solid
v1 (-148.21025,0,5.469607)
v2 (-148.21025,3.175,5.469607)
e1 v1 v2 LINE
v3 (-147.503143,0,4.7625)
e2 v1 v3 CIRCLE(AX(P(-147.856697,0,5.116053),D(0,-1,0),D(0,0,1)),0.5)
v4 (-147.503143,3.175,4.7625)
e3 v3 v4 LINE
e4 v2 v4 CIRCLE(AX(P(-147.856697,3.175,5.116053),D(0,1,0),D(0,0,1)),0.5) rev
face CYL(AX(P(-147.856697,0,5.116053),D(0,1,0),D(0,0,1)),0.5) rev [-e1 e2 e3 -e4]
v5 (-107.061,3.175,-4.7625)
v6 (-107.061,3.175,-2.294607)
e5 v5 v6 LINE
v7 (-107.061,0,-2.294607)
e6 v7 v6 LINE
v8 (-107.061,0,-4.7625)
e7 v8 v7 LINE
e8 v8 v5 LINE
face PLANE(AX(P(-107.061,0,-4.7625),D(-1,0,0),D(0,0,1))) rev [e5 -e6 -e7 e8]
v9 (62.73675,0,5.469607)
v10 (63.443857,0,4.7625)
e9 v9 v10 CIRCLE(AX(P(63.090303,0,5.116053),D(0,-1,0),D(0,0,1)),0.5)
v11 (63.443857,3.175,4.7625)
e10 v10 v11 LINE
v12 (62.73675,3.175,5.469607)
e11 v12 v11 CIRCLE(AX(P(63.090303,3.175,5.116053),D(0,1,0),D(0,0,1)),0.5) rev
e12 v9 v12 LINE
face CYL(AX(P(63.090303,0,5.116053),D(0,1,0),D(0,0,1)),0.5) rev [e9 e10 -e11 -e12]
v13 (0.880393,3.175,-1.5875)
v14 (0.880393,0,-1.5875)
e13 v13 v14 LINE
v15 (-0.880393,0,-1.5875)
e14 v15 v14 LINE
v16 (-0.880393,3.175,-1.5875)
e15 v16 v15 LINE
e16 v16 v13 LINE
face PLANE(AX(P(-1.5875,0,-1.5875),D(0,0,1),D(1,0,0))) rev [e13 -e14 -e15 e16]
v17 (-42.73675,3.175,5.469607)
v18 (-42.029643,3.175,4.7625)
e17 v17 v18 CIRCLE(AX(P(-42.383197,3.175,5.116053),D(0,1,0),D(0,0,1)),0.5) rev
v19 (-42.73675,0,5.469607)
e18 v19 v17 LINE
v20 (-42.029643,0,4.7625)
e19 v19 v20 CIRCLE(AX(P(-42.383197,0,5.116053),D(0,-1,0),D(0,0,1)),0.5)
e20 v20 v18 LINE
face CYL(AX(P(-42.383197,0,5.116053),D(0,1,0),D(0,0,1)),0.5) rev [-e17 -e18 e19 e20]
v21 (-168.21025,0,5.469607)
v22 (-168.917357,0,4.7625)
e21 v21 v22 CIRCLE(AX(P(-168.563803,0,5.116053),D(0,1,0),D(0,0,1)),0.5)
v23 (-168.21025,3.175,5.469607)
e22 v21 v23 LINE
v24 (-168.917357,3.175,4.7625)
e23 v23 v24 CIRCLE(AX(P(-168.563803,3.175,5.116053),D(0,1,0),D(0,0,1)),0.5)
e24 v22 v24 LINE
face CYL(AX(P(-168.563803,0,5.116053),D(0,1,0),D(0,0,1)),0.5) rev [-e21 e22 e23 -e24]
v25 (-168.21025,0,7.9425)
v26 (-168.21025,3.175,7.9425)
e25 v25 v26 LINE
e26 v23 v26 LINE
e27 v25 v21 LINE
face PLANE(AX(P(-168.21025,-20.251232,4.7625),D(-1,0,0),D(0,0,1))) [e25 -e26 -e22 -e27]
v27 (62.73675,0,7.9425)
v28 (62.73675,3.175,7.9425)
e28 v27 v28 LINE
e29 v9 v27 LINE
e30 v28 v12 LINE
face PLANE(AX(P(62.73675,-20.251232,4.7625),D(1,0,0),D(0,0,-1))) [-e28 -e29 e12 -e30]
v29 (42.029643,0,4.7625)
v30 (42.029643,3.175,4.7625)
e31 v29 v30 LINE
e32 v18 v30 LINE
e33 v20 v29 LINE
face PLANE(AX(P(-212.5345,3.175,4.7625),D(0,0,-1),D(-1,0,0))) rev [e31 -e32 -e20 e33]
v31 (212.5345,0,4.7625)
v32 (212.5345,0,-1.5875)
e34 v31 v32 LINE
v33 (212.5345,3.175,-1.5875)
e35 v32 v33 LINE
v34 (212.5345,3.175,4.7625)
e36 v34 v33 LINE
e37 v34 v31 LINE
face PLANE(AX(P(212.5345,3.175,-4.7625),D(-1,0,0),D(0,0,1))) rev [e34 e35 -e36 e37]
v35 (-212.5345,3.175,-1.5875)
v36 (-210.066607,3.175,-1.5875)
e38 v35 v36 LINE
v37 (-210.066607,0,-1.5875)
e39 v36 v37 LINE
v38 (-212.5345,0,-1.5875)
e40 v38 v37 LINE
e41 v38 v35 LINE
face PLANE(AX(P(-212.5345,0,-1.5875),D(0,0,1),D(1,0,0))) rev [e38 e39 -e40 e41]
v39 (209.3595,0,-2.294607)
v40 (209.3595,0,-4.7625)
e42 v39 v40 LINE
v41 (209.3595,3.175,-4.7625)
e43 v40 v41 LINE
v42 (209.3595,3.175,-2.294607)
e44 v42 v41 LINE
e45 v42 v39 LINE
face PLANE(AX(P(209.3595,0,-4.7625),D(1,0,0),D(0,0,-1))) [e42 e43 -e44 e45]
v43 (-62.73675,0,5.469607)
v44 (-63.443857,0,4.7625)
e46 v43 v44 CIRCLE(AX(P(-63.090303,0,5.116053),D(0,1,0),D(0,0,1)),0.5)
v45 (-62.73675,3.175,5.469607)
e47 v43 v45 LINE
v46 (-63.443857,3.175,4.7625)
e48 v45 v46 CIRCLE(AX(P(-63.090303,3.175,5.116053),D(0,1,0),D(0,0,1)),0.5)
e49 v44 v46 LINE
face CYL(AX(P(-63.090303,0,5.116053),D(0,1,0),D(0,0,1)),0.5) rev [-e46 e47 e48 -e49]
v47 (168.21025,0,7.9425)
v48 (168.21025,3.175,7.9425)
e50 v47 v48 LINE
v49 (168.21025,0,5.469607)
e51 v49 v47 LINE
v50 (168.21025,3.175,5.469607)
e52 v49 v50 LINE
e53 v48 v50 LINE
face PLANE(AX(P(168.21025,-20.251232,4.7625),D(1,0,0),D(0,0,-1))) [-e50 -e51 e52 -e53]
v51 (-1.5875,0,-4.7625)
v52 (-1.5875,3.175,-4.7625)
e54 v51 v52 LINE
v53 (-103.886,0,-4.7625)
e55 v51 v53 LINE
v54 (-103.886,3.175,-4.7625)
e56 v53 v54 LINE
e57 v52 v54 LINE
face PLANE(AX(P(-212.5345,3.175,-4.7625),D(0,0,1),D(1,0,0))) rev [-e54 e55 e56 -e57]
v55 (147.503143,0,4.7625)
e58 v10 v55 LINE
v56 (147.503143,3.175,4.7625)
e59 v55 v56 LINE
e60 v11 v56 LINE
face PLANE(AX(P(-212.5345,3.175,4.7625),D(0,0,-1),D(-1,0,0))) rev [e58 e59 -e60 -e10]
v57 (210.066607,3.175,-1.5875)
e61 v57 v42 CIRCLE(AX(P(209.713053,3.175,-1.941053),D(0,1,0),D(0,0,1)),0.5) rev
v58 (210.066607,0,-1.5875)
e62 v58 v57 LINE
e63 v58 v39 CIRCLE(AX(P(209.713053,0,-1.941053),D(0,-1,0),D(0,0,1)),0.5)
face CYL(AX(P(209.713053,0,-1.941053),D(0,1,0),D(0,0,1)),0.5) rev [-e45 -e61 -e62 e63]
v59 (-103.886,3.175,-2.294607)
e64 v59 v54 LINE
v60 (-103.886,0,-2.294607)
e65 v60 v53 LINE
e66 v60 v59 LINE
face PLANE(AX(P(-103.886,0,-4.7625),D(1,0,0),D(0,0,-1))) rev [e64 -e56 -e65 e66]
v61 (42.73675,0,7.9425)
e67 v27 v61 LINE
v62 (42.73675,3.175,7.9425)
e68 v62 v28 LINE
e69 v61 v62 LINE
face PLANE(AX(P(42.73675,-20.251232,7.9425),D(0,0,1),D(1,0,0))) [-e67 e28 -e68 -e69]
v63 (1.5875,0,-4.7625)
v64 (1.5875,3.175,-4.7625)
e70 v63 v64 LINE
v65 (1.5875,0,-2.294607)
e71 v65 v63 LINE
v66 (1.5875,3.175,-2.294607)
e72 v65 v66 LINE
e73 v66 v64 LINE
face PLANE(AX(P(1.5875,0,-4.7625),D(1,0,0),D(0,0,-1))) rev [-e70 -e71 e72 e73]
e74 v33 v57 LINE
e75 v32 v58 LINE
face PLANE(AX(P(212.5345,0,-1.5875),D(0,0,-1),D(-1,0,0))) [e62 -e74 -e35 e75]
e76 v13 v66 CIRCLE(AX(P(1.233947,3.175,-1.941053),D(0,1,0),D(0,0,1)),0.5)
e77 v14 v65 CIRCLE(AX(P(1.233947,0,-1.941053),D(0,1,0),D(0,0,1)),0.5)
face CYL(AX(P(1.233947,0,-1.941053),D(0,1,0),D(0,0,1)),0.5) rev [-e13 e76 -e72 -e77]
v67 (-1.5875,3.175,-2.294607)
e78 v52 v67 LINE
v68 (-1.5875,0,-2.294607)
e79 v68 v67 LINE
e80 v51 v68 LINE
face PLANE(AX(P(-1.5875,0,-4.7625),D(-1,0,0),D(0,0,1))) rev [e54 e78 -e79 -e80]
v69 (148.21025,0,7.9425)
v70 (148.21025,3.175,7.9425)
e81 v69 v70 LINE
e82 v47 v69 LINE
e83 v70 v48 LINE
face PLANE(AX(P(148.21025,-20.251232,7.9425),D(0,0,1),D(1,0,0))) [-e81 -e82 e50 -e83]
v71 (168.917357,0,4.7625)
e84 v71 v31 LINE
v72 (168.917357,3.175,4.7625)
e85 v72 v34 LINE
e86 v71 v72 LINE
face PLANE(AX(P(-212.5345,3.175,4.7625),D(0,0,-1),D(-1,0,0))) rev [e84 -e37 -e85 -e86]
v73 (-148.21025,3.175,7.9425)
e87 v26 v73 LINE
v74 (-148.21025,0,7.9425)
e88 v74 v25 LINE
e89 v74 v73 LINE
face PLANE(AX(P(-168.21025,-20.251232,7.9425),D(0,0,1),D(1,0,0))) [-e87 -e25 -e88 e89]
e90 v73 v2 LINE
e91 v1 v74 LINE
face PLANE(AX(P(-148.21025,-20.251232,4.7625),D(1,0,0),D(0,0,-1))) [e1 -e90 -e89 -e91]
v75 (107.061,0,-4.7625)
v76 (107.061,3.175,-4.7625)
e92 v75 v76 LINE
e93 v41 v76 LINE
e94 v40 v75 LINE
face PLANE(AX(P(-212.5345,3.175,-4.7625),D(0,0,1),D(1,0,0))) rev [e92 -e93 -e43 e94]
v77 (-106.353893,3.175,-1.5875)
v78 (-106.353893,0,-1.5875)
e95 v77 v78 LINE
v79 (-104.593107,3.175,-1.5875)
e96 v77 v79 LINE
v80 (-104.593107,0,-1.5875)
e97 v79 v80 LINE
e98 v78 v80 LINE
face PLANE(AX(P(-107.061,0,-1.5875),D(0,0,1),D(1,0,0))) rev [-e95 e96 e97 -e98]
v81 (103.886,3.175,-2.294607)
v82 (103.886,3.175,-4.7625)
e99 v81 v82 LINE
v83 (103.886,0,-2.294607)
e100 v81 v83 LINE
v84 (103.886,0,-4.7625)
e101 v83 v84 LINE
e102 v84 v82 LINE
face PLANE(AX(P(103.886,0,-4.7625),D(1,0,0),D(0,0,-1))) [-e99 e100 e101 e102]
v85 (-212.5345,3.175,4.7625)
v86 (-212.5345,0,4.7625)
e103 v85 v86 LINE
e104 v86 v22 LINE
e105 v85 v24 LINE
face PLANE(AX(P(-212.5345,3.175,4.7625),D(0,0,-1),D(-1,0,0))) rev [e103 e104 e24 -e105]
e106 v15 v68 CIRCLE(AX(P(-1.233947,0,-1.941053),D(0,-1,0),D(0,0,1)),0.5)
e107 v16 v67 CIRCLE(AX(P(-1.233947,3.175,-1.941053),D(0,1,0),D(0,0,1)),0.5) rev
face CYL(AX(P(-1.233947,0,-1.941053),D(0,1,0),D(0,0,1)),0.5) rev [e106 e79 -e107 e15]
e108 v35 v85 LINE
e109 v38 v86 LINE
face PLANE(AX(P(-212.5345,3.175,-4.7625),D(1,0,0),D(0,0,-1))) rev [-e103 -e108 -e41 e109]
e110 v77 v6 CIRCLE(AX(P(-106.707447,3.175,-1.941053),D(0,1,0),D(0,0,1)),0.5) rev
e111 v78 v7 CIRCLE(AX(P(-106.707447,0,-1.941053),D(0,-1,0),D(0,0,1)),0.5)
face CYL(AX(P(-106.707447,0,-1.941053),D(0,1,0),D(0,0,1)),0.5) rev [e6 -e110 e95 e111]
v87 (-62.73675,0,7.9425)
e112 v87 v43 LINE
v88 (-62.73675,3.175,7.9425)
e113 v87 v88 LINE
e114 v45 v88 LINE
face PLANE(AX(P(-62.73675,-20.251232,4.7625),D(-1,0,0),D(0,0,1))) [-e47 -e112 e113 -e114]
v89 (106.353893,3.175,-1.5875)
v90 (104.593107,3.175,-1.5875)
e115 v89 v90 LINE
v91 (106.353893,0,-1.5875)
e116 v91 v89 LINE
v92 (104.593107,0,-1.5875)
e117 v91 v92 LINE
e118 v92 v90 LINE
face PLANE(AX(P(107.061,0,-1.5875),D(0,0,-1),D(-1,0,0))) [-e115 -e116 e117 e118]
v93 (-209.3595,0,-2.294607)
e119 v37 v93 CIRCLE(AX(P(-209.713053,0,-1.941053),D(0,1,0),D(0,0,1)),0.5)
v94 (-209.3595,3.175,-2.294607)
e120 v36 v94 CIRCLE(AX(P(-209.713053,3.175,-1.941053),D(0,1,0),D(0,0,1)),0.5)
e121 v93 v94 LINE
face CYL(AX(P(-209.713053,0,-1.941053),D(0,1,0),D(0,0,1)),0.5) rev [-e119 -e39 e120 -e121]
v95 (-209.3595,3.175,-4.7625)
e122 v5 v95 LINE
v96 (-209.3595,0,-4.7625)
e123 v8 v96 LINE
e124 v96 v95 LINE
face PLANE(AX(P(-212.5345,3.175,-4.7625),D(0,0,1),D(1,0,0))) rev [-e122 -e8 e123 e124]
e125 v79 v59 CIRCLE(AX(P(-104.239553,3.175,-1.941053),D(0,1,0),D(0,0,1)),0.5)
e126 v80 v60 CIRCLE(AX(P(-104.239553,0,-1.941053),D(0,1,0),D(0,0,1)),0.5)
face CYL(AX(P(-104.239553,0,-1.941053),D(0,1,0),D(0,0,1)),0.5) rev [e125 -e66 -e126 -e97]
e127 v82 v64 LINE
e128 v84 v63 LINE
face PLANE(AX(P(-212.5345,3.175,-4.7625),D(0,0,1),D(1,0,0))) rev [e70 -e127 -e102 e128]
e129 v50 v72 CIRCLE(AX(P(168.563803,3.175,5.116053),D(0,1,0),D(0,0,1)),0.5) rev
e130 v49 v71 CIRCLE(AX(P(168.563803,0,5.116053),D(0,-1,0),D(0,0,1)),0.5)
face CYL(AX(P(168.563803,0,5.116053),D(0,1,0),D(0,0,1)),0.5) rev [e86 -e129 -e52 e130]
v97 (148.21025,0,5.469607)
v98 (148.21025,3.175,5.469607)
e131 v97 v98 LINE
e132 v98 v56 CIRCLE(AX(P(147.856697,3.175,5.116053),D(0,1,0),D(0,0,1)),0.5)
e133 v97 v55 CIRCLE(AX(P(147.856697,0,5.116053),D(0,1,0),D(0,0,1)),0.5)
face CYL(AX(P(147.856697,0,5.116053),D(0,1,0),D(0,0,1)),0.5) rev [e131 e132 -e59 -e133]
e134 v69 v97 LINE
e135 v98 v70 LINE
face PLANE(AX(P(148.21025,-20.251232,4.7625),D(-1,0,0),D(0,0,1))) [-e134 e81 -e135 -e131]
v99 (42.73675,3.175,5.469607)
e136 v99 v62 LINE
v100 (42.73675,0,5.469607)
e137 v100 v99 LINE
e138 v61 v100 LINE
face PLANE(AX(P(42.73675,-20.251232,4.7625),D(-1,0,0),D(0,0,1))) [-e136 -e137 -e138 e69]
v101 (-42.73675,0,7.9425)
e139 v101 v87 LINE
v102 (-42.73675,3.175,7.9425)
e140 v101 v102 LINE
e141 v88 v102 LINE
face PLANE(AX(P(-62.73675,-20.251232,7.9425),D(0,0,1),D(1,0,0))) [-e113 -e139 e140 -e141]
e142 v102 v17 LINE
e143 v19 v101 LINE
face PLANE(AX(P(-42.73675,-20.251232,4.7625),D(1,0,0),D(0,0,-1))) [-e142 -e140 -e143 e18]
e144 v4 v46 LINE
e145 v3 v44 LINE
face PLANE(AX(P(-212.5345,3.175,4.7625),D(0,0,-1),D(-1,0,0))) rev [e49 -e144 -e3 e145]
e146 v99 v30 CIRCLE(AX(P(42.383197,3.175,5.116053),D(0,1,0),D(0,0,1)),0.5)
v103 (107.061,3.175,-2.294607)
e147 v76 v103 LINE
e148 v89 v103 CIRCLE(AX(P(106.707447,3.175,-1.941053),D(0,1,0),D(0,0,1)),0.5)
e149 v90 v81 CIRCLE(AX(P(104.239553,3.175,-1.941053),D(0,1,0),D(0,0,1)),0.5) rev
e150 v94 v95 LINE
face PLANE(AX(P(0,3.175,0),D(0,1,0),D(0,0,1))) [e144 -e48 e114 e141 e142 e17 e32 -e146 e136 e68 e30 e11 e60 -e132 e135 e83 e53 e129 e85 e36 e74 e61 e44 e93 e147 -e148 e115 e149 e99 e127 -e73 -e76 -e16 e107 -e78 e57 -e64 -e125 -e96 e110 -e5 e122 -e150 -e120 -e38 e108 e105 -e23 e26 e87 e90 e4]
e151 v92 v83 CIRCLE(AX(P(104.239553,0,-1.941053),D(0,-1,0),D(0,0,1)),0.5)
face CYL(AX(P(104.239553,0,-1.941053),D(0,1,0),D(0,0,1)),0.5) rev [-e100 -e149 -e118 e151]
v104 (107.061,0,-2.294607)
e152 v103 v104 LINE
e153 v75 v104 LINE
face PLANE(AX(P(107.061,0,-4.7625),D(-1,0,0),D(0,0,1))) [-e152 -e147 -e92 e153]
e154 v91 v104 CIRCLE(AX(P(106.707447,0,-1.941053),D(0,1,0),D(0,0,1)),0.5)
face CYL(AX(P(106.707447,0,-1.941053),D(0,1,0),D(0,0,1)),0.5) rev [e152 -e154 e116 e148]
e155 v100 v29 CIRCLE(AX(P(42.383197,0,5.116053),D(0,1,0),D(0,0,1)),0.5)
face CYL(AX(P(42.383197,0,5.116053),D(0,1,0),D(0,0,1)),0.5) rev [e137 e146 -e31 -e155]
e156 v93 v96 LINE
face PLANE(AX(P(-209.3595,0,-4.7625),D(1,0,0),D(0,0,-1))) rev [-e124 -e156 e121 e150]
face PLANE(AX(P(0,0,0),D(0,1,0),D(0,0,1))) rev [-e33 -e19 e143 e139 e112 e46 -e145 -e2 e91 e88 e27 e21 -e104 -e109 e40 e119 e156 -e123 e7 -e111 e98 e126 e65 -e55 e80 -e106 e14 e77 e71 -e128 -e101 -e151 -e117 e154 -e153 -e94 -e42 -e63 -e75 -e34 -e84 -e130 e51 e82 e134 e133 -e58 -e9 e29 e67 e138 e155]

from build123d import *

# Parameters (mm, degrees)
SKETCH1_W             = 425.069
SKETCH1_H             = 9.525
BOSS_EXTRUDE1_DEPTH   = 3.175
SKETCH2_W             = 3.175
SKETCH2_H             = 3.175
CUT_EXTRUDE1_DEPTH    = 213.611560649
SKETCH3_R             = 0.5
CUT_EXTRUDE2_DEPTH    = 213.611560649
SKETCH_PATTERN1_DEPTH = 3.175
SKETCH5_W             = 20
SKETCH5_H             = 3.18
BOSS_EXTRUDE2_DEPTH   = 3.175
SKETCH6_R             = 0.5
CUT_EXTRUDE3_DEPTH    = 213.706552841
SKETCH_PATTERN2_DEPTH = 3.175


# Read off the part's stored shape, not the designer's step: Sketch-Pattern1, Sketch-Pattern2
with BuildPart() as part:
    # Sketch1 → Boss-Extrude1 (new body)
    with BuildSketch(Plane(origin=(0, 0, 0), x_dir=(1, 0, 0), z_dir=(0, 1, 0))):
        Rectangle(SKETCH1_W, SKETCH1_H)
    extrude(amount=BOSS_EXTRUDE1_DEPTH)

    # Sketch2 → Cut-Extrude1 (cut, symmetric)
    with BuildSketch(Plane(origin=(0, 3.175, 0), x_dir=(1, 0, 0), z_dir=(0, 1, 0))):
        with Locations((-105.4735, 3.175)):
            Rectangle(SKETCH2_W, SKETCH2_H)
        with Locations((-210.947, 3.175)):
            Rectangle(SKETCH2_W, SKETCH2_H)
        with Locations((0, 3.175)):
            Rectangle(SKETCH2_W, SKETCH2_H)
    cut_extrude1 = extrude(amount=CUT_EXTRUDE1_DEPTH, both=True, mode=Mode.SUBTRACT)

    # Sketch3 → Cut-Extrude2 (cut, symmetric)
    with BuildSketch(Plane(origin=(0, 3.175, 0), x_dir=(1, 0, 0), z_dir=(0, 1, 0))):
        with Locations((-209.713053391, 1.941053391)):
            Circle(SKETCH3_R)
    cut_extrude2 = extrude(amount=CUT_EXTRUDE2_DEPTH, both=True, mode=Mode.SUBTRACT)

    # Mirror1: Cut-Extrude1 across plane
    add(cut_extrude1.mirror(Plane(origin=(0, 0, 0), x_dir=(0, 0, 1), z_dir=(1, 0, 0))), mode=Mode.SUBTRACT)

    # Sketch-Pattern1 outline → Sketch-Pattern1 (cut)
    with BuildSketch(Plane(origin=(0, 0, 0), x_dir=(1, 0, 0), z_dir=(0, 1, 0))):
        with BuildLine():
            Line((-103.886, 1.5875), (-104.593106781, 1.5875))
            ThreePointArc((-104.593106781, 1.5875), (-104.23955339, 1.441053391), (-103.886, 1.5875))
        make_face()
        with BuildLine():
            Line((-103.886, 2.294606781), (-103.886, 1.5875))
            ThreePointArc((-103.886, 1.5875), (-103.739553391, 1.941053391), (-103.886, 2.294606781))
        make_face()
        with BuildLine():
            Line((107.061, 1.5875), (106.353893219, 1.5875))
            ThreePointArc((106.353893219, 1.5875), (106.70744661, 1.441053391), (107.061, 1.5875))
        make_face()
        with BuildLine():
            Line((107.061, 2.294606781), (107.061, 1.5875))
            ThreePointArc((107.061, 1.5875), (107.207446609, 1.941053391), (107.061, 2.294606781))
        make_face()
        with BuildLine():
            Line((1.5875, 1.5875), (0.880393219, 1.5875))
            ThreePointArc((0.880393219, 1.5875), (1.23394661, 1.441053391), (1.5875, 1.5875))
        make_face()
        with BuildLine():
            Line((1.5875, 2.294606781), (1.5875, 1.5875))
            ThreePointArc((1.5875, 1.5875), (1.733946609, 1.941053391), (1.5875, 2.294606781))
        make_face()
    sketch_pattern1 = extrude(amount=SKETCH_PATTERN1_DEPTH, mode=Mode.SUBTRACT)

    # Mirror2: Cut-Extrude2, Sketch-Pattern1 across plane
    add(cut_extrude2.mirror(Plane(origin=(0, 0, 0), x_dir=(0, 0, 1), z_dir=(1, 0, 0))), mode=Mode.SUBTRACT)
    add(sketch_pattern1.mirror(Plane(origin=(0, 0, 0), x_dir=(0, 0, 1), z_dir=(1, 0, 0))), mode=Mode.SUBTRACT)

    # Sketch5 → Boss-Extrude2 (add)
    with BuildSketch(Plane(origin=(0, 3.175, 0), x_dir=(1, 0, 0), z_dir=(0, 1, 0))):
        with Locations((-158.21025, -6.3525)):
            Rectangle(SKETCH5_W, SKETCH5_H)
        with Locations((-52.73675, -6.3525)):
            Rectangle(SKETCH5_W, SKETCH5_H)
        with Locations((52.73675, -6.3525)):
            Rectangle(SKETCH5_W, SKETCH5_H)
        with Locations((158.21025, -6.3525)):
            Rectangle(SKETCH5_W, SKETCH5_H)
    extrude(amount=-BOSS_EXTRUDE2_DEPTH)

    # Sketch6 → Cut-Extrude3 (cut, symmetric)
    with BuildSketch(Plane(origin=(0, 3.175, 0), x_dir=(1, 0, 0), z_dir=(0, 1, 0))):
        with Locations((-168.563803391, -5.116053391)):
            Circle(SKETCH6_R)
    cut_extrude3 = extrude(amount=CUT_EXTRUDE3_DEPTH, both=True, mode=Mode.SUBTRACT)

    # Sketch-Pattern2 outline → Sketch-Pattern2 (cut)
    with BuildSketch(Plane(origin=(0, 0, 0), x_dir=(1, 0, 0), z_dir=(0, 1, 0))):
        with BuildLine():
            Line((-62.73675, -4.7625), (-62.73675, -5.469606781))
            ThreePointArc((-62.73675, -5.469606781), (-62.590303391, -5.116053391), (-62.73675, -4.7625))
        make_face()
        with BuildLine():
            Line((-63.443856781, -4.7625), (-62.73675, -4.7625))
            ThreePointArc((-62.73675, -4.7625), (-63.09030339, -4.616053391), (-63.443856781, -4.7625))
        make_face()
        with BuildLine():
            Line((148.21025, -4.7625), (148.21025, -5.469606781))
            ThreePointArc((148.21025, -5.469606781), (148.356696609, -5.116053391), (148.21025, -4.7625))
        make_face()
        with BuildLine():
            Line((147.503143219, -4.7625), (148.21025, -4.7625))
            ThreePointArc((148.21025, -4.7625), (147.85669661, -4.616053391), (147.503143219, -4.7625))
        make_face()
        with BuildLine():
            Line((42.73675, -4.7625), (42.73675, -5.469606781))
            ThreePointArc((42.73675, -5.469606781), (42.883196609, -5.116053391), (42.73675, -4.7625))
        make_face()
        with BuildLine():
            Line((42.029643219, -4.7625), (42.73675, -4.7625))
            ThreePointArc((42.73675, -4.7625), (42.38319661, -4.616053391), (42.029643219, -4.7625))
        make_face()
    sketch_pattern2 = extrude(amount=SKETCH_PATTERN2_DEPTH, mode=Mode.SUBTRACT)

    # Mirror3: Cut-Extrude3, Sketch-Pattern2 across plane
    add(cut_extrude3.mirror(Plane(origin=(0, 0, 0), x_dir=(0, 0, 1), z_dir=(1, 0, 0))), mode=Mode.SUBTRACT)
    add(sketch_pattern2.mirror(Plane(origin=(0, 0, 0), x_dir=(0, 0, 1), z_dir=(1, 0, 0))), mode=Mode.SUBTRACT)


solid = part.part
